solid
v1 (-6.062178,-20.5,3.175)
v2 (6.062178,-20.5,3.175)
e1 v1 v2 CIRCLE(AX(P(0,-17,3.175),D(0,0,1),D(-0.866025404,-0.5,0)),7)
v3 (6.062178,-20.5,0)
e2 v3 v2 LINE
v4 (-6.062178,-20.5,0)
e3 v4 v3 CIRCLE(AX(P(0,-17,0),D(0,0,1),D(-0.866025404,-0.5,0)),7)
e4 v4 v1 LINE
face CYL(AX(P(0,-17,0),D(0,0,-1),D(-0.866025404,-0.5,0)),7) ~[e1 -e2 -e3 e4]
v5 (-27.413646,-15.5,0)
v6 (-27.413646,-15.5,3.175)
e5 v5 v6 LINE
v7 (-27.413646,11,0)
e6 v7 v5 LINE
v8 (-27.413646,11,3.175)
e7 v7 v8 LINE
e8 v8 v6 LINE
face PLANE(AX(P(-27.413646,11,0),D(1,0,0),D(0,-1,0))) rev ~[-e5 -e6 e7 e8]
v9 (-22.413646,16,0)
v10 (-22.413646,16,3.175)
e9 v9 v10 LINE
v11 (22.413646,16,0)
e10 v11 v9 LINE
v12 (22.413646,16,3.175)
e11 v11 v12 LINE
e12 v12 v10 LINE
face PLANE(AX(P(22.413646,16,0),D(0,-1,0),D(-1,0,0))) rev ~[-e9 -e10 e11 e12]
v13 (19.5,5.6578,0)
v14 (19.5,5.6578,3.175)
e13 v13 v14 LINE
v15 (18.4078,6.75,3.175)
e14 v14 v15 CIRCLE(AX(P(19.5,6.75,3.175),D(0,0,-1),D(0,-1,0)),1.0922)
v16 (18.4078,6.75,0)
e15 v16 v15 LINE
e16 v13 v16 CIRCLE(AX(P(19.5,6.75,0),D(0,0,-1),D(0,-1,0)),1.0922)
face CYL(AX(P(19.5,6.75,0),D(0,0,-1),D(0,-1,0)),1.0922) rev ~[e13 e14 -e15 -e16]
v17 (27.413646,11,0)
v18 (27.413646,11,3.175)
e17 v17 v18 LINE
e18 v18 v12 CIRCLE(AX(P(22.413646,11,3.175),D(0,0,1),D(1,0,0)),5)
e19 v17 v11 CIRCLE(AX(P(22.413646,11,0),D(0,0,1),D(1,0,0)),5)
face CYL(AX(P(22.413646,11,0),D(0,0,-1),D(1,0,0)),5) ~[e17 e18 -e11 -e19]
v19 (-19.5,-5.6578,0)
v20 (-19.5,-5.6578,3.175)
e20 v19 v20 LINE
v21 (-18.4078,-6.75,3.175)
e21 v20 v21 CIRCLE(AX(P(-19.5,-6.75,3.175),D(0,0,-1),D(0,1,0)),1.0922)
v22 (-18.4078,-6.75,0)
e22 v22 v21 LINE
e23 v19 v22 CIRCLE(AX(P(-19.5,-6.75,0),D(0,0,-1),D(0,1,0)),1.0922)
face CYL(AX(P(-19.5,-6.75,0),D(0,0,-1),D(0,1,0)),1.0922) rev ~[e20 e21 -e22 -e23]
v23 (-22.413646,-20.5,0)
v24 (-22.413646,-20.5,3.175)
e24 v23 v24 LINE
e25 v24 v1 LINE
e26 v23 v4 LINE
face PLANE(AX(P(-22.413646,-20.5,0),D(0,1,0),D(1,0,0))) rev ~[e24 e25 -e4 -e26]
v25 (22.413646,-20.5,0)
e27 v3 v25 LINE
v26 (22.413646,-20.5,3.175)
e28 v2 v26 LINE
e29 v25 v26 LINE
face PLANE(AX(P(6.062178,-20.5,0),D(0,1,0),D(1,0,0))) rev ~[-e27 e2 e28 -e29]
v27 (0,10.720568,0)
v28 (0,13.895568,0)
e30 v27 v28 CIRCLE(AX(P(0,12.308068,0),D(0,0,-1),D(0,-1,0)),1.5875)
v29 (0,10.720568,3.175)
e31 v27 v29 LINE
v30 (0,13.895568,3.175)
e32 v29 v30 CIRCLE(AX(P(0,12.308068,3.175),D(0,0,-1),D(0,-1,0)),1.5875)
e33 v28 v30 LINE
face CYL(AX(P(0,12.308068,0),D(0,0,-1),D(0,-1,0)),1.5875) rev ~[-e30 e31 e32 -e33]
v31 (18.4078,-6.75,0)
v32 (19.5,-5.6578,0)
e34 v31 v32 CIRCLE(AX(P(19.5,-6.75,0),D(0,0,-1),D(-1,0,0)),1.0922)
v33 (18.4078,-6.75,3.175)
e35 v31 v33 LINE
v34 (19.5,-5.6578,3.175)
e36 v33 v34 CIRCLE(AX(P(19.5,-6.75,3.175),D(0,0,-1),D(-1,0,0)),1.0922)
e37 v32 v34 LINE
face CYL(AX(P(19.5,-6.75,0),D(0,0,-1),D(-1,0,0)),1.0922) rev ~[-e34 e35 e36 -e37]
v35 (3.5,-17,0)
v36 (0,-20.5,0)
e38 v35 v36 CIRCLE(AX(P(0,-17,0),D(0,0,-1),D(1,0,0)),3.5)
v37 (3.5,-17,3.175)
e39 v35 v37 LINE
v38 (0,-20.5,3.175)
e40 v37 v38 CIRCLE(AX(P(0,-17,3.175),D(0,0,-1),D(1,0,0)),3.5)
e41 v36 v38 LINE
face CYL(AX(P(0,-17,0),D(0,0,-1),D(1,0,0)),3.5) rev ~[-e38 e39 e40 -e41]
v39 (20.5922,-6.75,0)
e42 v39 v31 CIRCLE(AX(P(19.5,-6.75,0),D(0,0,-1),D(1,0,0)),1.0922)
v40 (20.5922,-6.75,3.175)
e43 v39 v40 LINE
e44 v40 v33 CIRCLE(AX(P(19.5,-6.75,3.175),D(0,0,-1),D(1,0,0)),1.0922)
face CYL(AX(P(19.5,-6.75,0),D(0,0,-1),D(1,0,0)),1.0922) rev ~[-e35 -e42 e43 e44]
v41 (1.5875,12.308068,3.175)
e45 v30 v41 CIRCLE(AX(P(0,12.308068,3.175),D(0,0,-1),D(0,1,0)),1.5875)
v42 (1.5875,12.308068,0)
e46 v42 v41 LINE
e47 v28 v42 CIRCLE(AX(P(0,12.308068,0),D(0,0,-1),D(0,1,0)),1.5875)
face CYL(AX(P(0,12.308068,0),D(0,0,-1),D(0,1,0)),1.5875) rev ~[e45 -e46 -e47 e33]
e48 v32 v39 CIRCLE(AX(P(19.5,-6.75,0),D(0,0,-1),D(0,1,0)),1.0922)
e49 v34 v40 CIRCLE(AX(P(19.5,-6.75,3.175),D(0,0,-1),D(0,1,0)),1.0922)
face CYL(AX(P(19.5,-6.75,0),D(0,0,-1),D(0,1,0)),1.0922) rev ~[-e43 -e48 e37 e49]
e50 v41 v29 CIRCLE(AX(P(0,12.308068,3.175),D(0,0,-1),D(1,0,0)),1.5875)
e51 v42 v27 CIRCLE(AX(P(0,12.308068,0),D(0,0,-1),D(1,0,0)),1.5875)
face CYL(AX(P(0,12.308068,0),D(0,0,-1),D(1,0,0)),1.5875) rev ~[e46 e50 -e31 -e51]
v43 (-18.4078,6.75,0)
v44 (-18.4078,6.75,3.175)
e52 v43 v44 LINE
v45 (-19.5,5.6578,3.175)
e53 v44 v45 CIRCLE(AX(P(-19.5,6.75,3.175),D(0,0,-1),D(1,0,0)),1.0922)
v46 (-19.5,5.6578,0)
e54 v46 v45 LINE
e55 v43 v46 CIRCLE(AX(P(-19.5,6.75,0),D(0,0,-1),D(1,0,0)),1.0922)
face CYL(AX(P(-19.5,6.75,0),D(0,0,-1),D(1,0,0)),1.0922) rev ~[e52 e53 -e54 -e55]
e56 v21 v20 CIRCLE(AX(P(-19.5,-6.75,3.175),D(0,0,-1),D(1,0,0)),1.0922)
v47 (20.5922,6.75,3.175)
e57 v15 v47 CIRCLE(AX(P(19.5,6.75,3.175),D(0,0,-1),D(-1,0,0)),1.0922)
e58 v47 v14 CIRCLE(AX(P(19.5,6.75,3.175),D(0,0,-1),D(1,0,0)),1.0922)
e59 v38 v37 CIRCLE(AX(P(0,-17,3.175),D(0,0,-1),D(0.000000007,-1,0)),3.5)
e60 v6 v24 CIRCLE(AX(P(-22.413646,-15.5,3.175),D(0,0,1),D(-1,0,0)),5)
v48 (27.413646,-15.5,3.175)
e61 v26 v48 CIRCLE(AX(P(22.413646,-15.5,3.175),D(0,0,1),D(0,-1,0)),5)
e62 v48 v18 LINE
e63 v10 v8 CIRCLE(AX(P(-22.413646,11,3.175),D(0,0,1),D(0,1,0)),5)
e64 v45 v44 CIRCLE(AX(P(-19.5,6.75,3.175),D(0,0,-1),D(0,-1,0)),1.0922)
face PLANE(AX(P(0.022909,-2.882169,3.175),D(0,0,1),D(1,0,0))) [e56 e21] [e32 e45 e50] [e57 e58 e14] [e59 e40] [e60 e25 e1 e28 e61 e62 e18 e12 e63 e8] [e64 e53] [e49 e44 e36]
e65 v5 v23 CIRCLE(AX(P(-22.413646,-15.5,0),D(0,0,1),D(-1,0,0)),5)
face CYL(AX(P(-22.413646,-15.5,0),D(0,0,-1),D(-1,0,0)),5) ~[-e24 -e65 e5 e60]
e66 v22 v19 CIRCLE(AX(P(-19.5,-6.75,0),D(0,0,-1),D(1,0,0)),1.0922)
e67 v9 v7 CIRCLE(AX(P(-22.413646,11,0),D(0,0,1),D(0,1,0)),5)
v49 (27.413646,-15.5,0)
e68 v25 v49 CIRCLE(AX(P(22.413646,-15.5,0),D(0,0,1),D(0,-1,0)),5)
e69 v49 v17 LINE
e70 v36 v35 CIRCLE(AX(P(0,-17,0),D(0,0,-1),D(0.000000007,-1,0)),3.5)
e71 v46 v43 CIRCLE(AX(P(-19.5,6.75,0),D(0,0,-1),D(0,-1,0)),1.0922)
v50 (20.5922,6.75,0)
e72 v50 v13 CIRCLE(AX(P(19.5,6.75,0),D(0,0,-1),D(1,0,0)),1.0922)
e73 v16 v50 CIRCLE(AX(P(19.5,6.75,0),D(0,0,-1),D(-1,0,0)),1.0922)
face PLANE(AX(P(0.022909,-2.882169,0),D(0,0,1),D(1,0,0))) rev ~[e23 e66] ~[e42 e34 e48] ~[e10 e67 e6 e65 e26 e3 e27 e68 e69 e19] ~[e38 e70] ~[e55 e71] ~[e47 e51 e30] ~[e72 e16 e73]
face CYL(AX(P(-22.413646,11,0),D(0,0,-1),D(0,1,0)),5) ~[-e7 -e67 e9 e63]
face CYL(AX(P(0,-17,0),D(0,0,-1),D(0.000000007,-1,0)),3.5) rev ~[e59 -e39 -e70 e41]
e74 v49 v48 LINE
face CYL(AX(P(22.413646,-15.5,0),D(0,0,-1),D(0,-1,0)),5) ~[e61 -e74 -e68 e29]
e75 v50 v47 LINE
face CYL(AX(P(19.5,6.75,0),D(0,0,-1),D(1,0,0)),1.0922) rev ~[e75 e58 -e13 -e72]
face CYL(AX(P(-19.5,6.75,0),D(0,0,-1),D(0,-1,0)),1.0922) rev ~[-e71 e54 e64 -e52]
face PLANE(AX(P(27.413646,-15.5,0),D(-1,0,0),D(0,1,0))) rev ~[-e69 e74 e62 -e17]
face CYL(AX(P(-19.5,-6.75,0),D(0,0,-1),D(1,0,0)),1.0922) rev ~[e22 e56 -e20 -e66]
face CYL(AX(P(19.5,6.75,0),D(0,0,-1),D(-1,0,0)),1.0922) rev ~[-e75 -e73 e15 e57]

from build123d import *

# Parameters (mm, degrees)
F1_DEPTH = 3.175


# Not quite as in the source:
# - a length typed as a fraction of an inch, garbled in the dataset ("3 / 203.2 mm" for 3/8 in), is restored
# - a feature names something its author has since deleted; it is built from what else it names


with BuildPart() as f1:
    # F0 (on Top) → F1 (new body)
    with BuildSketch(Plane.XY):
        with BuildLine():
            Line((22.4136457592, 16), (0, 16))
            Line((0, 16), (-22.4136457592, 16))
            ThreePointArc((-22.4136457592, 16), (-25.9491796652, 14.5355339059), (-27.4136457592, 11))
            Line((-27.4136457592, 11), (-27.4136457592, -15.5))
            ThreePointArc((-27.4136457592, -15.5), (-25.9491796652, -19.0355339059), (-22.4136457592, -20.5))
            Line((-22.4136457592, -20.5), (-6.0621778265, -20.5))
            ThreePointArc((-6.0621778265, -20.5), (-1.8117333157, -10.238519216), (7, -17))
            ThreePointArc((7, -17), (6.761480784, -18.8117333157), (6.0621778265, -20.5))
            Line((6.0621778265, -20.5), (22.4136457592, -20.5))
            ThreePointArc((22.4136457592, -20.5), (25.9491796652, -19.0355339059), (27.4136457592, -15.5))
            Line((27.4136457592, -15.5), (27.4136457592, 11))
            ThreePointArc((27.4136457592, 11), (25.9491796652, 14.5355339059), (22.4136457592, 16))
        make_face()
        Polygon((22, 9), (22, -9), (-22, -9), (-22, 9), (0, 9), align=None, mode=Mode.SUBTRACT)
        with BuildLine():
            ThreePointArc((1.5875, 12.3080683509), (1.1225320151, 11.1855363358), (0, 10.7205683509))
            ThreePointArc((0, 10.7205683509), (-1.5875, 12.3080683509), (0, 13.8955683509))
            ThreePointArc((0, 13.8955683509), (1.1225320151, 13.4306003661), (1.5875, 12.3080683509))
        make_face(mode=Mode.SUBTRACT)
        Polygon((-22, -9), (22, -9), (22, 9), (0, 9), (-22, 9), align=None)
        with BuildLine():
            Line((-18.4078, 6.75), (0, 6.75))
            Line((0, 6.75), (18.4078, 6.75))
            ThreePointArc((18.4078, 6.75), (19.5, 7.8422), (20.5922, 6.75))
            ThreePointArc((20.5922, 6.75), (20.2723020264, 5.9776979736), (19.5, 5.6578))
            Line((19.5, 5.6578), (19.5, -5.6578))
            ThreePointArc((19.5, -5.6578), (20.2723020264, -5.9776979736), (20.5922, -6.75))
            ThreePointArc((20.5922, -6.75), (19.5, -7.8422), (18.4078, -6.75))
            Line((18.4078, -6.75), (-18.4078, -6.75))
            ThreePointArc((-18.4078, -6.75), (-20.2723020264, -7.5223020264), (-19.5, -5.6578))
            Line((-19.5, -5.6578), (-19.5, 5.6578))
            ThreePointArc((-19.5, 5.6578), (-20.2723020264, 7.5223020264), (-18.4078, 6.75))
        make_face(mode=Mode.SUBTRACT)
        with BuildLine():
            Line((18.4078, 6.75), (0, 6.75))
            Line((0, 6.75), (-18.4078, 6.75))
            ThreePointArc((-18.4078, 6.75), (-18.7276979736, 5.9776979736), (-19.5, 5.6578))
            Line((-19.5, 5.6578), (-19.5, -5.6578))
            ThreePointArc((-19.5, -5.6578), (-18.7276979736, -5.9776979736), (-18.4078, -6.75))
            Line((-18.4078, -6.75), (18.4078, -6.75))
            ThreePointArc((18.4078, -6.75), (18.7276979736, -5.9776979736), (19.5, -5.6578))
            Line((19.5, -5.6578), (19.5, 5.6578))
            ThreePointArc((19.5, 5.6578), (18.7276979736, 5.9776979736), (18.4078, 6.75))
        make_face()
        with BuildLine():
            ThreePointArc((7, -17), (-1.8117333157, -10.238519216), (-6.0621778265, -20.5))
            Line((-6.0621778265, -20.5), (2.55e-08, -20.5))
            Line((2.55e-08, -20.5), (6.0621778265, -20.5))
            ThreePointArc((6.0621778265, -20.5), (6.761480784, -18.8117333157), (7, -17))
        make_face()
        with BuildLine():
            ThreePointArc((3.5, -17), (2.4748737432, -19.4748737251), (2.55e-08, -20.5))
            ThreePointArc((2.55e-08, -20.5), (-2.4748737432, -14.5251262749), (3.5, -17))
        make_face(mode=Mode.SUBTRACT)
        with BuildLine():
            Line((2.55e-08, -20.5), (-6.0621778265, -20.5))
            ThreePointArc((-6.0621778265, -20.5), (0, -24), (6.0621778265, -20.5))
            Line((6.0621778265, -20.5), (2.55e-08, -20.5))
        make_face()
    extrude(amount=F1_DEPTH)


solid = f1.part
